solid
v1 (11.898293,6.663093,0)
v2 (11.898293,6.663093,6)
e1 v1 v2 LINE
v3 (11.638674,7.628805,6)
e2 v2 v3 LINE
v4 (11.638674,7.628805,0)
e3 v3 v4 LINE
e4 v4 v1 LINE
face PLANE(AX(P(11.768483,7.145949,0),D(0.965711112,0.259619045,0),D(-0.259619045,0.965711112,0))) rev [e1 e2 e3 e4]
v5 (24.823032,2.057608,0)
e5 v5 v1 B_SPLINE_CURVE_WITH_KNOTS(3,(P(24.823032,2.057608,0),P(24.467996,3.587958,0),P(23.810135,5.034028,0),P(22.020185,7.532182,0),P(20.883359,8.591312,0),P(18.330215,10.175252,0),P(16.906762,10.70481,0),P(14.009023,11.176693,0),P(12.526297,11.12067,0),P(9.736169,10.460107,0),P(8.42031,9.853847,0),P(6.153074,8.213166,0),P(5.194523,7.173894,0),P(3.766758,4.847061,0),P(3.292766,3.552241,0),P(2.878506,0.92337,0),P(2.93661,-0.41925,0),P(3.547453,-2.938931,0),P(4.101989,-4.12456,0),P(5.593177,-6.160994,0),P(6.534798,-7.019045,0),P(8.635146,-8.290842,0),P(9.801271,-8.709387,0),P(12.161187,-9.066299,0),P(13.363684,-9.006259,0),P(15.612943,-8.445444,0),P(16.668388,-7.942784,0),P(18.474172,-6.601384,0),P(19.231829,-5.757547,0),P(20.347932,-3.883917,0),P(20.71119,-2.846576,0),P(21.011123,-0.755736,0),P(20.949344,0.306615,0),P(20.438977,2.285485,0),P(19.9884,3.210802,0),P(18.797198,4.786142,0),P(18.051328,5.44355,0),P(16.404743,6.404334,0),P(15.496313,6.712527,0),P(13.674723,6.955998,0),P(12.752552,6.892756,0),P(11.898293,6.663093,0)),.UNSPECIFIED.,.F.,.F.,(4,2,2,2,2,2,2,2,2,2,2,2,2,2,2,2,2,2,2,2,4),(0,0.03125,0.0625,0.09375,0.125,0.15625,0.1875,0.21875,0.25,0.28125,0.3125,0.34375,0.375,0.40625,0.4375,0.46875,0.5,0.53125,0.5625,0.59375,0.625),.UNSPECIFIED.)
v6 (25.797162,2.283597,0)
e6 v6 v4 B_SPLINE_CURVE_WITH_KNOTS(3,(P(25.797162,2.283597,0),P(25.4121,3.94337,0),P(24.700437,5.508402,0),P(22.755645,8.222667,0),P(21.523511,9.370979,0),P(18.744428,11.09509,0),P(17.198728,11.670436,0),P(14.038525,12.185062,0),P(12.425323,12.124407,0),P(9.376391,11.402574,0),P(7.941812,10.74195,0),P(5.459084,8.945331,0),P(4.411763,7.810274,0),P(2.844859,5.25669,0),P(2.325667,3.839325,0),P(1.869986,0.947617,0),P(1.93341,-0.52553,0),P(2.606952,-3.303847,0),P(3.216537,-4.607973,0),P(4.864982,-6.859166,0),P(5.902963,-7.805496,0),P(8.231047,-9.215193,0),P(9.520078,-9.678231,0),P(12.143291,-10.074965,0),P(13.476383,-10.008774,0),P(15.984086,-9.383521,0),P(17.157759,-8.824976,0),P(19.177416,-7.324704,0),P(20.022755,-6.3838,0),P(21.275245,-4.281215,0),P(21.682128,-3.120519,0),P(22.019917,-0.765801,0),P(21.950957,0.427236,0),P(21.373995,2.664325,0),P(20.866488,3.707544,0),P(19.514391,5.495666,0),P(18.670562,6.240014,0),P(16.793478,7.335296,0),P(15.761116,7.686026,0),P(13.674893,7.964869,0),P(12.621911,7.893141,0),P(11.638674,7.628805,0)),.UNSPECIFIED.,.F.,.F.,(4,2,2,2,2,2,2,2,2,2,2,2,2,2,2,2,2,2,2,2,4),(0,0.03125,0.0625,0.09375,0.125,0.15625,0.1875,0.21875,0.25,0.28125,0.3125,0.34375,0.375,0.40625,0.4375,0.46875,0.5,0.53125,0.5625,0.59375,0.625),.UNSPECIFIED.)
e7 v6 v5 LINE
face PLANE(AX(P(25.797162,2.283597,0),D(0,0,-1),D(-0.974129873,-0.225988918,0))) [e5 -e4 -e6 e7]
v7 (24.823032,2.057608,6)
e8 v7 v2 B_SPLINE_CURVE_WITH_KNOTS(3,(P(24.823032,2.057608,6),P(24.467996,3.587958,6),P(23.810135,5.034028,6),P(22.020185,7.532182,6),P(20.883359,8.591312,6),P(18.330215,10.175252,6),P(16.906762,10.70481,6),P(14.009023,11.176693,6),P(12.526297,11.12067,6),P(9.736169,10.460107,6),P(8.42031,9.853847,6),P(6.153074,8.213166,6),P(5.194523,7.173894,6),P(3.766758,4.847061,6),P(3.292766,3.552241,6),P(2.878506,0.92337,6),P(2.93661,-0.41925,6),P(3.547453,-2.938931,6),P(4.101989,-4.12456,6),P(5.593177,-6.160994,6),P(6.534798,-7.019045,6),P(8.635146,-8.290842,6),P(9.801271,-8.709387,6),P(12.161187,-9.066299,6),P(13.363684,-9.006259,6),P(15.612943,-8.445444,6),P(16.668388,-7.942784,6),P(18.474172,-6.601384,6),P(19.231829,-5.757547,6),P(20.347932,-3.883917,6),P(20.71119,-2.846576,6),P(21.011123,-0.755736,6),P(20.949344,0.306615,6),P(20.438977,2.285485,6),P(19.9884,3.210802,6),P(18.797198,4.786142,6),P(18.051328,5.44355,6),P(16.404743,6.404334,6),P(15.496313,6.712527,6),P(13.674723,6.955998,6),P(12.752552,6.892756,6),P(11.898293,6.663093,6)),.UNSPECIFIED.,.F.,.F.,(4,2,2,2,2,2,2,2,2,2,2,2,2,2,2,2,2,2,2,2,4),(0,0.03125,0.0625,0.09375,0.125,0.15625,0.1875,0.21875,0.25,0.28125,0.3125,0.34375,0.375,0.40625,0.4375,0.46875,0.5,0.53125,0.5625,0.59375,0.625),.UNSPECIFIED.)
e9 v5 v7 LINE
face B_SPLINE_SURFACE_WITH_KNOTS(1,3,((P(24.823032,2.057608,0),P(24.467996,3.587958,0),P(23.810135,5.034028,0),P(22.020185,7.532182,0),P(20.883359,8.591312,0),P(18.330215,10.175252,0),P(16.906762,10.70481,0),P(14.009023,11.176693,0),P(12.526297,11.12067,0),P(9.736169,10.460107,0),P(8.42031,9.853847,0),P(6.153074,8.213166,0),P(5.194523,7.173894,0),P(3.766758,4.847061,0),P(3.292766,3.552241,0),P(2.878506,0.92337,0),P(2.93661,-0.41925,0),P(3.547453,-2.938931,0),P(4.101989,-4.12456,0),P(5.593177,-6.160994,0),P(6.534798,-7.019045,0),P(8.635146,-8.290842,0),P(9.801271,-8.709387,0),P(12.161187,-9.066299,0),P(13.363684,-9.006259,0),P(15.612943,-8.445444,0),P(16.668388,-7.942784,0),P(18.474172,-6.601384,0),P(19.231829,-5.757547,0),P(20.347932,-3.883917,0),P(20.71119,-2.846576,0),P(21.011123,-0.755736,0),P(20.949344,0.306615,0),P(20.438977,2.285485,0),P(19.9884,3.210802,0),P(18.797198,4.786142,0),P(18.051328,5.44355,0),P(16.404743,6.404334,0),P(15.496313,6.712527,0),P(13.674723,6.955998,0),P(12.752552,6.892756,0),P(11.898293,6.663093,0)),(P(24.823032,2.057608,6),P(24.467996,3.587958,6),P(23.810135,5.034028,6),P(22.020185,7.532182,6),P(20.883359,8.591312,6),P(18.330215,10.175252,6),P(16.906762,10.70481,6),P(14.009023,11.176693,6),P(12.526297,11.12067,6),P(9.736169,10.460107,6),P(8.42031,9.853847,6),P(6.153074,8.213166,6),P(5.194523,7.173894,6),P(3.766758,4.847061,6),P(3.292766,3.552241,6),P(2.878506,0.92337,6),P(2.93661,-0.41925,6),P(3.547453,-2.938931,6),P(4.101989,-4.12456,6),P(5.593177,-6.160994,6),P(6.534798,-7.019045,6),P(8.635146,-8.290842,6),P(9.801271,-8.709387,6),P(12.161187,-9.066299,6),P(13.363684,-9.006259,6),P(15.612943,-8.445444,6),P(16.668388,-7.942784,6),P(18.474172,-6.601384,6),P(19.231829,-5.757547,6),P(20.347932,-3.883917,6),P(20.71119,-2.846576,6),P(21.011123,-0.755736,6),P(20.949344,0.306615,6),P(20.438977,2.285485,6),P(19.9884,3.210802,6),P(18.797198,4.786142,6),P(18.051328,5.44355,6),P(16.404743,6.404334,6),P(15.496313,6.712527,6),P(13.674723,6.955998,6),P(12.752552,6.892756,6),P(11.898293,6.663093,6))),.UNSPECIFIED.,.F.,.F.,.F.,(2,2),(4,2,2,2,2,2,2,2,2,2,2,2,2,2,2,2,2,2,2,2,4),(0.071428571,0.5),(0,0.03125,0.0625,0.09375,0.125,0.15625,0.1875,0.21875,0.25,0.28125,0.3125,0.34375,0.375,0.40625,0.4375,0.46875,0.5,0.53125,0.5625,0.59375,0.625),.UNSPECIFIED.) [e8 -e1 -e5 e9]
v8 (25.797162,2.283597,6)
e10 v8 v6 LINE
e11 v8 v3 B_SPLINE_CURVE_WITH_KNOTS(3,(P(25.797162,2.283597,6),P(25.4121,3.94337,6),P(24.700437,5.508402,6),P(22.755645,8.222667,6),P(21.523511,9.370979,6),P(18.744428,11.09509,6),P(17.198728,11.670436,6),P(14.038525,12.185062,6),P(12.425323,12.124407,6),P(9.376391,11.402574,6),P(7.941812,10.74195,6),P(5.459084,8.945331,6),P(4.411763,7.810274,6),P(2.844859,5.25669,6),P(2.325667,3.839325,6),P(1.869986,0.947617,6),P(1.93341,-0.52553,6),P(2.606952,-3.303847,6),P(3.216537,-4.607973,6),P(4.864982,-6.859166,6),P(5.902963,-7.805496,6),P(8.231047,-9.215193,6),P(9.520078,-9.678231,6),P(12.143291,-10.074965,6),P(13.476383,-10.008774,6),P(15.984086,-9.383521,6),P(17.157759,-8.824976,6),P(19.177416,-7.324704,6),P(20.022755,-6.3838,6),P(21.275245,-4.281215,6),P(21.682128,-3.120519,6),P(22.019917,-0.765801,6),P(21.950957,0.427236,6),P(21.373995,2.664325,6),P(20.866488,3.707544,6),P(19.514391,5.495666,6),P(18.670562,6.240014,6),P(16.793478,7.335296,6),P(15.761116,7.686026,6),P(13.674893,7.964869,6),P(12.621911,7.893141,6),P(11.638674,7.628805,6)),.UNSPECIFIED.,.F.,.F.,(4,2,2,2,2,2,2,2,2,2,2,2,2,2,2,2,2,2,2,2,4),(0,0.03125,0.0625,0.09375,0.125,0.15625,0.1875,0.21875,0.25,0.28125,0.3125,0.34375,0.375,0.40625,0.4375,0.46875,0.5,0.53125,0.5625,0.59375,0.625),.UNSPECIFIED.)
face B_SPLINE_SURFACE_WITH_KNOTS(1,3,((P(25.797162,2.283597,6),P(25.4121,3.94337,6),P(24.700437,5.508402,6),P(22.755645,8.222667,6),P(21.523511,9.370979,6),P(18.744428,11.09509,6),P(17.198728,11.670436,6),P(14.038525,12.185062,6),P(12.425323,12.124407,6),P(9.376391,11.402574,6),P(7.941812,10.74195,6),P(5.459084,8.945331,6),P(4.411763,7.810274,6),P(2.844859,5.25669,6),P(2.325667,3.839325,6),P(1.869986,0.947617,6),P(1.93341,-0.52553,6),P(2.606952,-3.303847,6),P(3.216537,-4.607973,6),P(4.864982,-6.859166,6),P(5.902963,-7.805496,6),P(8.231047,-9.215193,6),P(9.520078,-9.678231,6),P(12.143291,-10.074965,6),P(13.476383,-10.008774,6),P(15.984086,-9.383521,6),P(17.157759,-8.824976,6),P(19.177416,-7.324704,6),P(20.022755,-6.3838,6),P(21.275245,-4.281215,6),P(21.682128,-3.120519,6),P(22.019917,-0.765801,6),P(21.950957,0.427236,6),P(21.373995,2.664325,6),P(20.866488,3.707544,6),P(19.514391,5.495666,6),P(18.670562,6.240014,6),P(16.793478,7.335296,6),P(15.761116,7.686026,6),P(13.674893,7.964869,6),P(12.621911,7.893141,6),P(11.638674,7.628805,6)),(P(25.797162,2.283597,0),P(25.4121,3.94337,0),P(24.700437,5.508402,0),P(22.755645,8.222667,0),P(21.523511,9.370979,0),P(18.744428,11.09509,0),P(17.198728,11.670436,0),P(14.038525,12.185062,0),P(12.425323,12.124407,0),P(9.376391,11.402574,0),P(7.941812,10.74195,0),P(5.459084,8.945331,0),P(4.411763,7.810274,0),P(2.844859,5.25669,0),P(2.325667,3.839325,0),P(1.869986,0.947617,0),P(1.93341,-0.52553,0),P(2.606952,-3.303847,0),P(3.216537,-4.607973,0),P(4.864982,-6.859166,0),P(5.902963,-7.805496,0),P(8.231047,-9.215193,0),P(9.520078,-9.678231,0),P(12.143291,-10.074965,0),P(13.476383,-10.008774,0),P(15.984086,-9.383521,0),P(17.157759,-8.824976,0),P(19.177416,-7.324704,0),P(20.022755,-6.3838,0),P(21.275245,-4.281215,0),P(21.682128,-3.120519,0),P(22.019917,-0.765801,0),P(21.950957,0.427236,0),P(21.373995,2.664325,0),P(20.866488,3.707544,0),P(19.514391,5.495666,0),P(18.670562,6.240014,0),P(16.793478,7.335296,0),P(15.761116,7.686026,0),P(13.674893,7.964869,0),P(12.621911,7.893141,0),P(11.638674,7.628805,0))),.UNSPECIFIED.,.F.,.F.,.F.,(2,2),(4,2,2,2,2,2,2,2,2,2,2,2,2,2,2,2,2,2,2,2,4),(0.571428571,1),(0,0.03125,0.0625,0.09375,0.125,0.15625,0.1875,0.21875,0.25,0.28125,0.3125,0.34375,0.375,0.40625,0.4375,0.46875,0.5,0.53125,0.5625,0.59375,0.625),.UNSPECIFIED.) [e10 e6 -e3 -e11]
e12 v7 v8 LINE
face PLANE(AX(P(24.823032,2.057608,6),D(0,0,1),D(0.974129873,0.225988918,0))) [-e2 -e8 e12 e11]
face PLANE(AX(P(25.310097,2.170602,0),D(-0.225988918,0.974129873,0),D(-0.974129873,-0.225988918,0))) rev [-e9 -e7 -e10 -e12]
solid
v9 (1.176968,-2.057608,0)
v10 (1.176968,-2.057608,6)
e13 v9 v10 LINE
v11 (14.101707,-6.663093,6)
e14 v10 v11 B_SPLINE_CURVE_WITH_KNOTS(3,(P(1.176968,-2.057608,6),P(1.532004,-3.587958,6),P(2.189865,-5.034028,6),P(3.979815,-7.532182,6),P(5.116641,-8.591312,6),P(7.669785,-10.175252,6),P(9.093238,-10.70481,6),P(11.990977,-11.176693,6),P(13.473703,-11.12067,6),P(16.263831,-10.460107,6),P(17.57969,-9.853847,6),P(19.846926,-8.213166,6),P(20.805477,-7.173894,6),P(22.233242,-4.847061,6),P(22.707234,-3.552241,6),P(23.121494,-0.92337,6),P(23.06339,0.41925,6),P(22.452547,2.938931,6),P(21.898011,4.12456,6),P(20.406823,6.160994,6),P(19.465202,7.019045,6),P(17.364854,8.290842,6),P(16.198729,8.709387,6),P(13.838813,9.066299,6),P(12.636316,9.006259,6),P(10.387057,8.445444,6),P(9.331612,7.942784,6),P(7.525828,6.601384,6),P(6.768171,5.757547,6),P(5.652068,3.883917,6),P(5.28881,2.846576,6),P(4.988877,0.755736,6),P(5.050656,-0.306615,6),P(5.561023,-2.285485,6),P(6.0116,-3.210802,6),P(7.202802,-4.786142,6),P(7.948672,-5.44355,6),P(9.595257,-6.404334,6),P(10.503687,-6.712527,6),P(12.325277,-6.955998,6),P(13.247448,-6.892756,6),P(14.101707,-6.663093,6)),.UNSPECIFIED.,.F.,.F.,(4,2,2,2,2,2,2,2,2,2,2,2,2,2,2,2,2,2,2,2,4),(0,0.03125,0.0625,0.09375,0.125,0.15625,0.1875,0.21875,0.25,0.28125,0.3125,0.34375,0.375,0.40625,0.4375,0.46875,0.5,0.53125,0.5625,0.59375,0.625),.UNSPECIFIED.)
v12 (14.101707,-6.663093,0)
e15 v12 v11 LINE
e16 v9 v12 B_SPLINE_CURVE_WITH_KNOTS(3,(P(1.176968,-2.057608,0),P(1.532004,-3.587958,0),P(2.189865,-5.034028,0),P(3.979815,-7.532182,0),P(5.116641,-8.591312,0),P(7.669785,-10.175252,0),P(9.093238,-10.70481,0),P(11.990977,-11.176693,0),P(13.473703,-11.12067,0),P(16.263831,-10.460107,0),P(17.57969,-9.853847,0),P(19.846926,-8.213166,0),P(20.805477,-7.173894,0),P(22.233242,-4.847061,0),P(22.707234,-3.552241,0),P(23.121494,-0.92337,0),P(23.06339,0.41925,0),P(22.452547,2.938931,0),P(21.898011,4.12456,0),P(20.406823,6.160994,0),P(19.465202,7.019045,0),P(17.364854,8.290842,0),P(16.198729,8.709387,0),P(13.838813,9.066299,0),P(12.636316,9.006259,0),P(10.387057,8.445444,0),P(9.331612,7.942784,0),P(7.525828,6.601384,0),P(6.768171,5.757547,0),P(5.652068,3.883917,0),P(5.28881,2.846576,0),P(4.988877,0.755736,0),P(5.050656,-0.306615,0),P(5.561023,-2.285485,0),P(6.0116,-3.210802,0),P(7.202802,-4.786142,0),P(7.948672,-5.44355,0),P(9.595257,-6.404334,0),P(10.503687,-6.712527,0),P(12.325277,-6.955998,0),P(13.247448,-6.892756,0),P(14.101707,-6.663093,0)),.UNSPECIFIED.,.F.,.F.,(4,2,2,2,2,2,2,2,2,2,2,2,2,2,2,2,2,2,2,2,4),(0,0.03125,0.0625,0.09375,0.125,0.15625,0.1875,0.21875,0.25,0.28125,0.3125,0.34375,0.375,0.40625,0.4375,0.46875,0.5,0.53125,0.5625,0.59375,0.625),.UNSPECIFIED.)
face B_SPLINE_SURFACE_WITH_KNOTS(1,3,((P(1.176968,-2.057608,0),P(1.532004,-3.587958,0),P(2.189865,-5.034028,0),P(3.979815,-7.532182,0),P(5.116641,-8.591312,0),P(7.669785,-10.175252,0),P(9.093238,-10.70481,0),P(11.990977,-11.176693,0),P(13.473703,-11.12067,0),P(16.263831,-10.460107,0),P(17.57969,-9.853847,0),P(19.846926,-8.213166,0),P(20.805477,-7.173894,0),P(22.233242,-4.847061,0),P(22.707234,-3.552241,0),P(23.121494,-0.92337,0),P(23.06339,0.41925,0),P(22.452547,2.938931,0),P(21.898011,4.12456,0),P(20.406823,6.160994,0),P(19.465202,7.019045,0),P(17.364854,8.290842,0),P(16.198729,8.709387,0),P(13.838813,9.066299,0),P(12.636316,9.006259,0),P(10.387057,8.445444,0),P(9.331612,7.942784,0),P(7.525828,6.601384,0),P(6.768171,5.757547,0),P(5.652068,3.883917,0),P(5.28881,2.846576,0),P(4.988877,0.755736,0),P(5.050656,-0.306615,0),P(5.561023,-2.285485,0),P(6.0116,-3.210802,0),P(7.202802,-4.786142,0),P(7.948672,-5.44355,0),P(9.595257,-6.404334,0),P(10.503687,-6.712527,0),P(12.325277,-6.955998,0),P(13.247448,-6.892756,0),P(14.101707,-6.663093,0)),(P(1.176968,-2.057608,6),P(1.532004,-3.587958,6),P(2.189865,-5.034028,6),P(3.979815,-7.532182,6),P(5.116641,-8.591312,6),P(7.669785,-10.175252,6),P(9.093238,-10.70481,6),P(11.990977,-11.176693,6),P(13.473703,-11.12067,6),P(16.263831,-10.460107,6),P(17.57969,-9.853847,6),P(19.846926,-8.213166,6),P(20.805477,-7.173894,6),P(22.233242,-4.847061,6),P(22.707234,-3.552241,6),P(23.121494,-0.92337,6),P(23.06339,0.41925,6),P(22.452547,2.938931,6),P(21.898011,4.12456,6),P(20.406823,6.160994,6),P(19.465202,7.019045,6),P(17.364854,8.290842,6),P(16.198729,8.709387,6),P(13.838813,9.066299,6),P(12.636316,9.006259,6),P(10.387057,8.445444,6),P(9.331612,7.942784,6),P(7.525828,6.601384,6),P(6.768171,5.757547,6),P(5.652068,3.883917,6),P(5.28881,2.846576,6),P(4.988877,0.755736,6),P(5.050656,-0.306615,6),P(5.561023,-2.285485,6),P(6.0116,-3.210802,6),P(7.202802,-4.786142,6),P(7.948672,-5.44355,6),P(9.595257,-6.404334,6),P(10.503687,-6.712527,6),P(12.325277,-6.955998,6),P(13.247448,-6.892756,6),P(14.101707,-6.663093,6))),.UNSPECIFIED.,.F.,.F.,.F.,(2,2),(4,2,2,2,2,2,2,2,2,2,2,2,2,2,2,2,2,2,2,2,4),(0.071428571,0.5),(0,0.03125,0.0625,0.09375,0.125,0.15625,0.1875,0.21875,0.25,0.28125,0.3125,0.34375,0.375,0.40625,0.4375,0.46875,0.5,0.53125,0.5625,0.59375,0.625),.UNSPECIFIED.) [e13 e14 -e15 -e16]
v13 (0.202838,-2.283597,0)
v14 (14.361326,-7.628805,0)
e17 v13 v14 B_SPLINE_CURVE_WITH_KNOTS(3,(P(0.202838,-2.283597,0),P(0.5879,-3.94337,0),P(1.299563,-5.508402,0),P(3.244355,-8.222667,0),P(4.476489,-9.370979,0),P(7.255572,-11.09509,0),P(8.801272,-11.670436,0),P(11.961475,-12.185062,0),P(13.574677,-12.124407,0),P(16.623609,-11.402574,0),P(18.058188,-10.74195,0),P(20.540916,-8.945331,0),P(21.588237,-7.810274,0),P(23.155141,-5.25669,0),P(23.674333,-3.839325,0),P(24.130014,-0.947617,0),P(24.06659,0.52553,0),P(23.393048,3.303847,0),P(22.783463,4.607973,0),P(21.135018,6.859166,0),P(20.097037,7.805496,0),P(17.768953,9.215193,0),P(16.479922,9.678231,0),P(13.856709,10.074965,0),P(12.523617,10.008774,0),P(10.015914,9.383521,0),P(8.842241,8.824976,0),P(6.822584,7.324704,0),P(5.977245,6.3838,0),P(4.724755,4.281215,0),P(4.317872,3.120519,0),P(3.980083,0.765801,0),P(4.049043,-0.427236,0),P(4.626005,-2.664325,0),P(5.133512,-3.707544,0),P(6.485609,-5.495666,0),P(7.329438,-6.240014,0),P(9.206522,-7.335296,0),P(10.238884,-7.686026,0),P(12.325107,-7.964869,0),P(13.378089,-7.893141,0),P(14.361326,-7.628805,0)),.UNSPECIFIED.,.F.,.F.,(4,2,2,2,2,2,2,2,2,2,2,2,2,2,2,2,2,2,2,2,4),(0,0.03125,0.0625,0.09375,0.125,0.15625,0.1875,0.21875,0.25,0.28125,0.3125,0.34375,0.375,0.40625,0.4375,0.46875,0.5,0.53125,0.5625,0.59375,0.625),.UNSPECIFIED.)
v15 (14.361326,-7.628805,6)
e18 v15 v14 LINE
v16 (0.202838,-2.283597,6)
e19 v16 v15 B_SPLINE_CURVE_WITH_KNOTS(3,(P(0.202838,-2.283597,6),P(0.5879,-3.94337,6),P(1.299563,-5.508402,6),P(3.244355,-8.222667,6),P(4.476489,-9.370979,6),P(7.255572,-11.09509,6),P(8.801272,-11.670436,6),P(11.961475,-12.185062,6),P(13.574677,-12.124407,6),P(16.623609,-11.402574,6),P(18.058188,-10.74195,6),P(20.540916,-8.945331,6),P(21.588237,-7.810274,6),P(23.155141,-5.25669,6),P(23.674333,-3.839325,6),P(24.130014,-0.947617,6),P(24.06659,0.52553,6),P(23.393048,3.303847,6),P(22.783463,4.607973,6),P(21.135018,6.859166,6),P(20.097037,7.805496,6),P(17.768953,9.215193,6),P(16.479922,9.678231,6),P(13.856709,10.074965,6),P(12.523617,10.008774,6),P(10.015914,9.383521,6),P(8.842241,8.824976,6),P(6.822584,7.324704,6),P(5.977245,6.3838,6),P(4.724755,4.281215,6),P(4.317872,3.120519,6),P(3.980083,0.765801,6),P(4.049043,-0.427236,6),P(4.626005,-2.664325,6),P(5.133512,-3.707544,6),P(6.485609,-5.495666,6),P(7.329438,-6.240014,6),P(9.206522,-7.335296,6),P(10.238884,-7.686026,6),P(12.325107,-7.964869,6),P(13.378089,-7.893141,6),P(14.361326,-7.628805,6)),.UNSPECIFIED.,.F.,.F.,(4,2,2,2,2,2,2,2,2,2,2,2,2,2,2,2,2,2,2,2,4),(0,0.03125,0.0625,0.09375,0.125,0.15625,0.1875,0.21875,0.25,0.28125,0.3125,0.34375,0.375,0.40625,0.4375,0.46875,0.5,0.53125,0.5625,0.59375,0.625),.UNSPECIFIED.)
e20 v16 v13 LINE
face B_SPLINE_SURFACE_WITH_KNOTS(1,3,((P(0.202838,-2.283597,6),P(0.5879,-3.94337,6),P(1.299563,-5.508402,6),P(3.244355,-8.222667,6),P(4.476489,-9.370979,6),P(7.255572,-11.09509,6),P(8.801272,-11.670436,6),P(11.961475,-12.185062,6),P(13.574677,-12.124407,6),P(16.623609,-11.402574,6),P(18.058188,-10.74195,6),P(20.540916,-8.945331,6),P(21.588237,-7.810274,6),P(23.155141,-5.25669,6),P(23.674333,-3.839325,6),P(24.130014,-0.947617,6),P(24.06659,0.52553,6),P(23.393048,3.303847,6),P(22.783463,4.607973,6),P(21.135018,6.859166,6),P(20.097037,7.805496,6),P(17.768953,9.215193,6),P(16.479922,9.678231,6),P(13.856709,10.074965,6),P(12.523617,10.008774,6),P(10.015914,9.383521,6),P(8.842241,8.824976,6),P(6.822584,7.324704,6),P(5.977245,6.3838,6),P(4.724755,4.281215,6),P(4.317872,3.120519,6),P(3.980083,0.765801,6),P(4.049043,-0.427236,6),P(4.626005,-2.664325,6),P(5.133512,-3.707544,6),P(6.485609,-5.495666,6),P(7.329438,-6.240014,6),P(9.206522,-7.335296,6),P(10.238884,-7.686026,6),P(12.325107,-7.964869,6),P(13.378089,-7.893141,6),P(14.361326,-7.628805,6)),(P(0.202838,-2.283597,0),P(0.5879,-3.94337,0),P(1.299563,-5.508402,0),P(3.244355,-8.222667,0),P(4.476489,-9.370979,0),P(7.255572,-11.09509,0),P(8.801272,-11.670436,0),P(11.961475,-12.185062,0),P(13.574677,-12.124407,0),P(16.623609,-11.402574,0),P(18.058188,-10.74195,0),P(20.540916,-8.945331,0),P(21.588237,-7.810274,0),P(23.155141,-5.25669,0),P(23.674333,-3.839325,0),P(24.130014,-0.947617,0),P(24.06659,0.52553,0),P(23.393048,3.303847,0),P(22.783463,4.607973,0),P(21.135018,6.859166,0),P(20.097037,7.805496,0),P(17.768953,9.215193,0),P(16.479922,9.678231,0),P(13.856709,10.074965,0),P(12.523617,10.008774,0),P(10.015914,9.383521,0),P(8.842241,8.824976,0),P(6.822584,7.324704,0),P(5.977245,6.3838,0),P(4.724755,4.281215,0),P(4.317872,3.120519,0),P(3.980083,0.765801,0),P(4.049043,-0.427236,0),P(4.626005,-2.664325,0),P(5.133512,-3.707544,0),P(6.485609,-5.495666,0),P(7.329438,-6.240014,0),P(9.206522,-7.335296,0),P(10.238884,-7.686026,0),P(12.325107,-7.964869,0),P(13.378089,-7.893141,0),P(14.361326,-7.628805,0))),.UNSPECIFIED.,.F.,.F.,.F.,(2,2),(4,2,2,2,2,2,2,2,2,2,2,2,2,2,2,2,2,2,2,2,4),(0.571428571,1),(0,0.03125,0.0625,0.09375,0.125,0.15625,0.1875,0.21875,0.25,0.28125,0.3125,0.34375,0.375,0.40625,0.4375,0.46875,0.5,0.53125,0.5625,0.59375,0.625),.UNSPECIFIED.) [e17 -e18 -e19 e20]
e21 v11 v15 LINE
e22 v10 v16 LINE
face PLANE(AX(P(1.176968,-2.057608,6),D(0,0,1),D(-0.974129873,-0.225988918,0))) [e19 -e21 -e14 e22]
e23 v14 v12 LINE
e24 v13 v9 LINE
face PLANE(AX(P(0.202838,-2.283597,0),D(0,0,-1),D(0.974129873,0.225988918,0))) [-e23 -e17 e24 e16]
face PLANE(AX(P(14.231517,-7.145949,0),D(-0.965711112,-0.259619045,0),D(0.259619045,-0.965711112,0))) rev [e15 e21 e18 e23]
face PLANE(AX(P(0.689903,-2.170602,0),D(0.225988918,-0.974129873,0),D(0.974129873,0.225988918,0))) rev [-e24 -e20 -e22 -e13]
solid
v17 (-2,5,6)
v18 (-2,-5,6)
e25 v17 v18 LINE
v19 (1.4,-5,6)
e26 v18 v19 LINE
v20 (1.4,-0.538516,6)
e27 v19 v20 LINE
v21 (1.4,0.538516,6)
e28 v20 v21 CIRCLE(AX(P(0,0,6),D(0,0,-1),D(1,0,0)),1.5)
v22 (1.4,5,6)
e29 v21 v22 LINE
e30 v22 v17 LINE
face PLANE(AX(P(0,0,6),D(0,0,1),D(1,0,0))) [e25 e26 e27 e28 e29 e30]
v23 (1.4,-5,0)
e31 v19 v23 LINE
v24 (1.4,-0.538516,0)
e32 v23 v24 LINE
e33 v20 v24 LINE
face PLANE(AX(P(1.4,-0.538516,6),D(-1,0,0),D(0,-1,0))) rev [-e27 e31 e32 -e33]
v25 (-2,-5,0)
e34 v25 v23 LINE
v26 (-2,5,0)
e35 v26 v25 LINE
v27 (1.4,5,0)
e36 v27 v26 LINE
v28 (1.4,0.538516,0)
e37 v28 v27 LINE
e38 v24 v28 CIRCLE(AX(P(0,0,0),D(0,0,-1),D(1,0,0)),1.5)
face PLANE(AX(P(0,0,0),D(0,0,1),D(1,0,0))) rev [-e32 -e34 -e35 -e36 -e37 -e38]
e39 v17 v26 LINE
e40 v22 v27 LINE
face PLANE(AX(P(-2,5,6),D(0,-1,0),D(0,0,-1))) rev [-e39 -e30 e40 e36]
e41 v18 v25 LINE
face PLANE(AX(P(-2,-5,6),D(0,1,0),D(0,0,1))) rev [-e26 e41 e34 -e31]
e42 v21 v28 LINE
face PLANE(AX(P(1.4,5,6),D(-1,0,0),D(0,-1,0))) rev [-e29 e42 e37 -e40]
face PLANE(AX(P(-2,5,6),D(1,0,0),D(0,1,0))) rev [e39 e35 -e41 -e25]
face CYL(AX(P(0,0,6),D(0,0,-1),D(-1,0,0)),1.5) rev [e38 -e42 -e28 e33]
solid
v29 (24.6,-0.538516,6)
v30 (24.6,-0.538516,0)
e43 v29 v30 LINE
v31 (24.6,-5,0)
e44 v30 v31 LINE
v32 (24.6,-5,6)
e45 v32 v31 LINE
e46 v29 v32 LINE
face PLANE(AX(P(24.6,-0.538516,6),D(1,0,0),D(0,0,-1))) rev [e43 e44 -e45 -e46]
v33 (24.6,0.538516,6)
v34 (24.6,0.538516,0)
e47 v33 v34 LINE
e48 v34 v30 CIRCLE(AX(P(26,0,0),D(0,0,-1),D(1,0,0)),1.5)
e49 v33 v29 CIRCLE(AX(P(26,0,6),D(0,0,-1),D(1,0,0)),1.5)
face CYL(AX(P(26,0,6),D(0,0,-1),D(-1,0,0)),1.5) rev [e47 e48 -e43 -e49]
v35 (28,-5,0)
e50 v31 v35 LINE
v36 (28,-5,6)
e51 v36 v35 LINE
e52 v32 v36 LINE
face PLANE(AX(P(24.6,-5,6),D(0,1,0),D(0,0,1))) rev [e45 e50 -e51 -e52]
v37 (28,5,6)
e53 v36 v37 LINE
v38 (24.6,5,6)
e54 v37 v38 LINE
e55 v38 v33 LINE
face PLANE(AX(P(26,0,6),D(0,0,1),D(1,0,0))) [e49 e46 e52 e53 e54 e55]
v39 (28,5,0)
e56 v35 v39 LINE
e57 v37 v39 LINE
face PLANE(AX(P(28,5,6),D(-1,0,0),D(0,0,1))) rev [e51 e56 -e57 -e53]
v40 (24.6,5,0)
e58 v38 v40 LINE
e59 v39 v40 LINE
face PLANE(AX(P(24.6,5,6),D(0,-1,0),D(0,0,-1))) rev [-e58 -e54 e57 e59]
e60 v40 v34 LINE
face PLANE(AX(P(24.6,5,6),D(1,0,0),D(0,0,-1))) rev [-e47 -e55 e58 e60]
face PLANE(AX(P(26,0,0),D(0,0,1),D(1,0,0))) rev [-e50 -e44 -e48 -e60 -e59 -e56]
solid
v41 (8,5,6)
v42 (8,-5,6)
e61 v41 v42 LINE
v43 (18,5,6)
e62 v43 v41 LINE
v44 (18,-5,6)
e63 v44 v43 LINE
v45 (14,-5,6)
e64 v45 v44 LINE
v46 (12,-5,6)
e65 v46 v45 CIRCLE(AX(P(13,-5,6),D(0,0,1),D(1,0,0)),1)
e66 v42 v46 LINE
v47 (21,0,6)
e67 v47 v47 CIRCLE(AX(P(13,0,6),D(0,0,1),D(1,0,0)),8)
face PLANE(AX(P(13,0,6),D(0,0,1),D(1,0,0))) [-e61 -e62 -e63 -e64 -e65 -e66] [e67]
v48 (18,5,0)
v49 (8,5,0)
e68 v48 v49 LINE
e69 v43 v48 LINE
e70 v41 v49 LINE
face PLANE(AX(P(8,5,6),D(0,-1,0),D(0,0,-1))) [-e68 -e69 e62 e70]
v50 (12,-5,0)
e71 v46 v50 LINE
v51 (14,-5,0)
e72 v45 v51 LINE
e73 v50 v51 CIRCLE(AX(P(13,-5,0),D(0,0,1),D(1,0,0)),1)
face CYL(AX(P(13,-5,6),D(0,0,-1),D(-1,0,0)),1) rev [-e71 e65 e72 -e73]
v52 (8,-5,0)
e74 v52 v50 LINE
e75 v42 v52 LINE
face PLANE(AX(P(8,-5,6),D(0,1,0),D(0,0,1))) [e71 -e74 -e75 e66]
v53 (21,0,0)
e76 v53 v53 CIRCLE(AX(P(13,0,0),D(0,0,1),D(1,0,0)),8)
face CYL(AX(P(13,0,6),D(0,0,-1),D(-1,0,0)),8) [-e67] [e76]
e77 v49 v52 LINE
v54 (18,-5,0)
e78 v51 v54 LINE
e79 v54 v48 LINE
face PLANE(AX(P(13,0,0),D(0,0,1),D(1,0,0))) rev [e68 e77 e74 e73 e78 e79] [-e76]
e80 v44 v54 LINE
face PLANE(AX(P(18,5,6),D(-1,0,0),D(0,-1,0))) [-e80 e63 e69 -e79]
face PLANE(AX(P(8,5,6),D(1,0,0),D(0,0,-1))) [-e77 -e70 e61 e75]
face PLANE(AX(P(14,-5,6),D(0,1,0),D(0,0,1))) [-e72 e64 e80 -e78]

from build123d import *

# Parameters (mm, degrees)
ESQUISSE1_R                  = 8
BOSS_EXTRU_1_DEPTH           = 6
BOSS_EXTRU_1_2_DEPTH         = 6
BOSS_EXTRU_1_3_DEPTH         = 6
BALAYAGE2_DEPTH              = 6
R_P_TITION_CIRCULAIRE5_COUNT = 2


# Read off the part's stored shape, not the designer's step: Balayage2
with BuildPart() as part:
    # Esquisse1 → Boss.-Extru.1 (new body)
    with BuildSketch(Plane.XY):
        with Locations((13, 0)):
            Circle(ESQUISSE1_R)
        with BuildLine():
            Line((8, 5), (18, 5))
            Line((18, 5), (18, -5))
            Line((18, -5), (14, -5))
            ThreePointArc((14, -5), (13, -6), (12, -5))
            Line((12, -5), (8, -5))
            Line((8, -5), (8, 5))
        make_face(mode=Mode.SUBTRACT)
    extrude(amount=BOSS_EXTRU_1_DEPTH)


with BuildPart() as body_2:
    # Esquisse1 → Boss.-Extru.1 2 (new body)
    with BuildSketch(Plane.XY):
        with BuildLine():
            Line((1.4, -0.538516481), (1.4, -5))
            Line((1.4, -5), (-2, -5))
            Line((-2, -5), (-2, 5))
            Line((-2, 5), (1.4, 5))
            Line((1.4, 5), (1.4, 0.538516481))
            ThreePointArc((1.4, 0.538516481), (-1.5, 0), (1.4, -0.538516481))
        make_face()
    extrude(amount=BOSS_EXTRU_1_2_DEPTH)


with BuildPart() as body_3:
    # Esquisse1 → Boss.-Extru.1 3 (new body)
    with BuildSketch(Plane.XY):
        with BuildLine():
            Line((24.6, 5), (28, 5))
            Line((28, 5), (28, -5))
            Line((28, -5), (24.6, -5))
            Line((24.6, -5), (24.6, -0.538516481))
            ThreePointArc((24.6, -0.538516481), (27.5, 0), (24.6, 0.538516481))
            Line((24.6, 0.538516481), (24.6, 5))
        make_face()
    extrude(amount=BOSS_EXTRU_1_3_DEPTH)


with BuildPart() as body_4:
    # Balayage2 outline → Balayage2 (new body)
    with BuildSketch(Plane.XY):
        with BuildLine():
            add(Edge.make_bspline(
                [(1.176968024, -2.057607761), (1.532004388, -3.587957641), (2.189865068, -5.034027877), (3.979815148, -7.532182315), (5.116641113, -8.591312436), (7.669785443, -10.175252194), (9.093237562, -10.704809661), (11.990976631, -11.176692715), (13.473702859, -11.120669906), (16.263831198, -10.460107284), (17.579689694, -9.853846655), (19.846925987, -8.213166384), (20.805476635, -7.173893884), (22.233242289, -4.847061431), (22.707233655, -3.552240546), (23.121493975, -0.923369554), (23.063390164, 0.419249589), (22.45254668, 2.93893067), (21.898011427, 4.12456005), (20.40682269, 6.160994259), (19.465201987, 7.019045382), (17.364853716, 8.290842442), (16.19872889, 8.709387144), (13.838812964, 9.066299138), (12.636316417, 9.006259466), (10.387056724, 8.445443563), (9.331612409, 7.942784448), (7.525828014, 6.601383874), (6.768170621, 5.757547164), (5.652068324, 3.88391657), (5.288810258, 2.846576338), (4.988876636, 0.755736303), (5.050655525, -0.306614956), (5.561023224, -2.285484703), (6.011599577, -3.210802352), (7.202802422, -4.786142294), (7.948671532, -5.443550133), (9.595257016, -6.404334039), (10.503687336, -6.712526897), (12.325277053, -6.955998018), (13.247448354, -6.892755757), (14.101707233, -6.663093425)],
                knots=[0, 0, 0, 0, 0.03125, 0.03125, 0.0625, 0.0625, 0.09375, 0.09375, 0.125, 0.125, 0.15625, 0.15625, 0.1875, 0.1875, 0.21875, 0.21875, 0.25, 0.25, 0.28125, 0.28125, 0.3125, 0.3125, 0.34375, 0.34375, 0.375, 0.375, 0.40625, 0.40625, 0.4375, 0.4375, 0.46875, 0.46875, 0.5, 0.5, 0.53125, 0.53125, 0.5625, 0.5625, 0.59375, 0.59375, 0.625, 0.625, 0.625, 0.625], degree=3))
            Line((1.176968024, -2.057607761), (0.20283815, -2.28359668))
            add(Edge.make_bspline(
                [(0.20283815, -2.28359668), (0.587899547, -3.943370079), (1.299562511, -5.508402457), (3.244355099, -8.222666506), (4.476488928, -9.37097856), (7.255571989, -11.095089853), (8.801271592, -11.670436106), (11.961474623, -12.185061799), (13.574676606, -12.12440674), (16.623608593, -11.402574035), (18.058187903, -10.74195019), (20.540916475, -8.945331426), (21.588237339, -7.810273925), (23.155141411, -5.256690418), (23.674333473, -3.839325304), (24.130013575, -0.947617294), (24.066590292, 0.525529804), (23.393047559, 3.303847235), (22.783462891, 4.607973348), (21.135017951, 6.859166444), (20.097036779, 7.805496117), (17.768952826, 9.215192969), (16.4799222, 9.678230839), (13.856709211, 10.074965353), (12.523616999, 10.008773842), (10.015914123, 9.383521083), (8.842241207, 8.824975592), (6.822583586, 7.324704477), (5.977245106, 6.383799631), (4.724755471, 4.281215234), (4.317871796, 3.120519095), (3.980082868, 0.765801128), (4.049042608, -0.427236198), (4.626005391, -2.66432452), (5.133511709, -3.707544237), (6.485608996, -5.495666384), (7.329437517, -6.24001367), (9.206522357, -7.335296089), (10.238884009, -7.686025568), (12.325106954, -7.964868912), (13.378089394, -7.89314094), (14.361326278, -7.628804538)],
                knots=[0, 0, 0, 0, 0.03125, 0.03125, 0.0625, 0.0625, 0.09375, 0.09375, 0.125, 0.125, 0.15625, 0.15625, 0.1875, 0.1875, 0.21875, 0.21875, 0.25, 0.25, 0.28125, 0.28125, 0.3125, 0.3125, 0.34375, 0.34375, 0.375, 0.375, 0.40625, 0.40625, 0.4375, 0.4375, 0.46875, 0.46875, 0.5, 0.5, 0.53125, 0.53125, 0.5625, 0.5625, 0.59375, 0.59375, 0.625, 0.625, 0.625, 0.625], degree=3))
            Line((14.361326278, -7.628804538), (14.101707233, -6.663093425))
        make_face()
    extrude(amount=BALAYAGE2_DEPTH)


with BuildPart() as r_p_tition_circulaire5_1:
    # Répétition circulaire5: pattern copy
    add(body_4.part.rotate(Axis((13, 0, 0), (0, 0, 1)), 1 * 360 / R_P_TITION_CIRCULAIRE5_COUNT))


solid = Compound([part.part, body_2.part, body_3.part, body_4.part, r_p_tition_circulaire5_1.part])
